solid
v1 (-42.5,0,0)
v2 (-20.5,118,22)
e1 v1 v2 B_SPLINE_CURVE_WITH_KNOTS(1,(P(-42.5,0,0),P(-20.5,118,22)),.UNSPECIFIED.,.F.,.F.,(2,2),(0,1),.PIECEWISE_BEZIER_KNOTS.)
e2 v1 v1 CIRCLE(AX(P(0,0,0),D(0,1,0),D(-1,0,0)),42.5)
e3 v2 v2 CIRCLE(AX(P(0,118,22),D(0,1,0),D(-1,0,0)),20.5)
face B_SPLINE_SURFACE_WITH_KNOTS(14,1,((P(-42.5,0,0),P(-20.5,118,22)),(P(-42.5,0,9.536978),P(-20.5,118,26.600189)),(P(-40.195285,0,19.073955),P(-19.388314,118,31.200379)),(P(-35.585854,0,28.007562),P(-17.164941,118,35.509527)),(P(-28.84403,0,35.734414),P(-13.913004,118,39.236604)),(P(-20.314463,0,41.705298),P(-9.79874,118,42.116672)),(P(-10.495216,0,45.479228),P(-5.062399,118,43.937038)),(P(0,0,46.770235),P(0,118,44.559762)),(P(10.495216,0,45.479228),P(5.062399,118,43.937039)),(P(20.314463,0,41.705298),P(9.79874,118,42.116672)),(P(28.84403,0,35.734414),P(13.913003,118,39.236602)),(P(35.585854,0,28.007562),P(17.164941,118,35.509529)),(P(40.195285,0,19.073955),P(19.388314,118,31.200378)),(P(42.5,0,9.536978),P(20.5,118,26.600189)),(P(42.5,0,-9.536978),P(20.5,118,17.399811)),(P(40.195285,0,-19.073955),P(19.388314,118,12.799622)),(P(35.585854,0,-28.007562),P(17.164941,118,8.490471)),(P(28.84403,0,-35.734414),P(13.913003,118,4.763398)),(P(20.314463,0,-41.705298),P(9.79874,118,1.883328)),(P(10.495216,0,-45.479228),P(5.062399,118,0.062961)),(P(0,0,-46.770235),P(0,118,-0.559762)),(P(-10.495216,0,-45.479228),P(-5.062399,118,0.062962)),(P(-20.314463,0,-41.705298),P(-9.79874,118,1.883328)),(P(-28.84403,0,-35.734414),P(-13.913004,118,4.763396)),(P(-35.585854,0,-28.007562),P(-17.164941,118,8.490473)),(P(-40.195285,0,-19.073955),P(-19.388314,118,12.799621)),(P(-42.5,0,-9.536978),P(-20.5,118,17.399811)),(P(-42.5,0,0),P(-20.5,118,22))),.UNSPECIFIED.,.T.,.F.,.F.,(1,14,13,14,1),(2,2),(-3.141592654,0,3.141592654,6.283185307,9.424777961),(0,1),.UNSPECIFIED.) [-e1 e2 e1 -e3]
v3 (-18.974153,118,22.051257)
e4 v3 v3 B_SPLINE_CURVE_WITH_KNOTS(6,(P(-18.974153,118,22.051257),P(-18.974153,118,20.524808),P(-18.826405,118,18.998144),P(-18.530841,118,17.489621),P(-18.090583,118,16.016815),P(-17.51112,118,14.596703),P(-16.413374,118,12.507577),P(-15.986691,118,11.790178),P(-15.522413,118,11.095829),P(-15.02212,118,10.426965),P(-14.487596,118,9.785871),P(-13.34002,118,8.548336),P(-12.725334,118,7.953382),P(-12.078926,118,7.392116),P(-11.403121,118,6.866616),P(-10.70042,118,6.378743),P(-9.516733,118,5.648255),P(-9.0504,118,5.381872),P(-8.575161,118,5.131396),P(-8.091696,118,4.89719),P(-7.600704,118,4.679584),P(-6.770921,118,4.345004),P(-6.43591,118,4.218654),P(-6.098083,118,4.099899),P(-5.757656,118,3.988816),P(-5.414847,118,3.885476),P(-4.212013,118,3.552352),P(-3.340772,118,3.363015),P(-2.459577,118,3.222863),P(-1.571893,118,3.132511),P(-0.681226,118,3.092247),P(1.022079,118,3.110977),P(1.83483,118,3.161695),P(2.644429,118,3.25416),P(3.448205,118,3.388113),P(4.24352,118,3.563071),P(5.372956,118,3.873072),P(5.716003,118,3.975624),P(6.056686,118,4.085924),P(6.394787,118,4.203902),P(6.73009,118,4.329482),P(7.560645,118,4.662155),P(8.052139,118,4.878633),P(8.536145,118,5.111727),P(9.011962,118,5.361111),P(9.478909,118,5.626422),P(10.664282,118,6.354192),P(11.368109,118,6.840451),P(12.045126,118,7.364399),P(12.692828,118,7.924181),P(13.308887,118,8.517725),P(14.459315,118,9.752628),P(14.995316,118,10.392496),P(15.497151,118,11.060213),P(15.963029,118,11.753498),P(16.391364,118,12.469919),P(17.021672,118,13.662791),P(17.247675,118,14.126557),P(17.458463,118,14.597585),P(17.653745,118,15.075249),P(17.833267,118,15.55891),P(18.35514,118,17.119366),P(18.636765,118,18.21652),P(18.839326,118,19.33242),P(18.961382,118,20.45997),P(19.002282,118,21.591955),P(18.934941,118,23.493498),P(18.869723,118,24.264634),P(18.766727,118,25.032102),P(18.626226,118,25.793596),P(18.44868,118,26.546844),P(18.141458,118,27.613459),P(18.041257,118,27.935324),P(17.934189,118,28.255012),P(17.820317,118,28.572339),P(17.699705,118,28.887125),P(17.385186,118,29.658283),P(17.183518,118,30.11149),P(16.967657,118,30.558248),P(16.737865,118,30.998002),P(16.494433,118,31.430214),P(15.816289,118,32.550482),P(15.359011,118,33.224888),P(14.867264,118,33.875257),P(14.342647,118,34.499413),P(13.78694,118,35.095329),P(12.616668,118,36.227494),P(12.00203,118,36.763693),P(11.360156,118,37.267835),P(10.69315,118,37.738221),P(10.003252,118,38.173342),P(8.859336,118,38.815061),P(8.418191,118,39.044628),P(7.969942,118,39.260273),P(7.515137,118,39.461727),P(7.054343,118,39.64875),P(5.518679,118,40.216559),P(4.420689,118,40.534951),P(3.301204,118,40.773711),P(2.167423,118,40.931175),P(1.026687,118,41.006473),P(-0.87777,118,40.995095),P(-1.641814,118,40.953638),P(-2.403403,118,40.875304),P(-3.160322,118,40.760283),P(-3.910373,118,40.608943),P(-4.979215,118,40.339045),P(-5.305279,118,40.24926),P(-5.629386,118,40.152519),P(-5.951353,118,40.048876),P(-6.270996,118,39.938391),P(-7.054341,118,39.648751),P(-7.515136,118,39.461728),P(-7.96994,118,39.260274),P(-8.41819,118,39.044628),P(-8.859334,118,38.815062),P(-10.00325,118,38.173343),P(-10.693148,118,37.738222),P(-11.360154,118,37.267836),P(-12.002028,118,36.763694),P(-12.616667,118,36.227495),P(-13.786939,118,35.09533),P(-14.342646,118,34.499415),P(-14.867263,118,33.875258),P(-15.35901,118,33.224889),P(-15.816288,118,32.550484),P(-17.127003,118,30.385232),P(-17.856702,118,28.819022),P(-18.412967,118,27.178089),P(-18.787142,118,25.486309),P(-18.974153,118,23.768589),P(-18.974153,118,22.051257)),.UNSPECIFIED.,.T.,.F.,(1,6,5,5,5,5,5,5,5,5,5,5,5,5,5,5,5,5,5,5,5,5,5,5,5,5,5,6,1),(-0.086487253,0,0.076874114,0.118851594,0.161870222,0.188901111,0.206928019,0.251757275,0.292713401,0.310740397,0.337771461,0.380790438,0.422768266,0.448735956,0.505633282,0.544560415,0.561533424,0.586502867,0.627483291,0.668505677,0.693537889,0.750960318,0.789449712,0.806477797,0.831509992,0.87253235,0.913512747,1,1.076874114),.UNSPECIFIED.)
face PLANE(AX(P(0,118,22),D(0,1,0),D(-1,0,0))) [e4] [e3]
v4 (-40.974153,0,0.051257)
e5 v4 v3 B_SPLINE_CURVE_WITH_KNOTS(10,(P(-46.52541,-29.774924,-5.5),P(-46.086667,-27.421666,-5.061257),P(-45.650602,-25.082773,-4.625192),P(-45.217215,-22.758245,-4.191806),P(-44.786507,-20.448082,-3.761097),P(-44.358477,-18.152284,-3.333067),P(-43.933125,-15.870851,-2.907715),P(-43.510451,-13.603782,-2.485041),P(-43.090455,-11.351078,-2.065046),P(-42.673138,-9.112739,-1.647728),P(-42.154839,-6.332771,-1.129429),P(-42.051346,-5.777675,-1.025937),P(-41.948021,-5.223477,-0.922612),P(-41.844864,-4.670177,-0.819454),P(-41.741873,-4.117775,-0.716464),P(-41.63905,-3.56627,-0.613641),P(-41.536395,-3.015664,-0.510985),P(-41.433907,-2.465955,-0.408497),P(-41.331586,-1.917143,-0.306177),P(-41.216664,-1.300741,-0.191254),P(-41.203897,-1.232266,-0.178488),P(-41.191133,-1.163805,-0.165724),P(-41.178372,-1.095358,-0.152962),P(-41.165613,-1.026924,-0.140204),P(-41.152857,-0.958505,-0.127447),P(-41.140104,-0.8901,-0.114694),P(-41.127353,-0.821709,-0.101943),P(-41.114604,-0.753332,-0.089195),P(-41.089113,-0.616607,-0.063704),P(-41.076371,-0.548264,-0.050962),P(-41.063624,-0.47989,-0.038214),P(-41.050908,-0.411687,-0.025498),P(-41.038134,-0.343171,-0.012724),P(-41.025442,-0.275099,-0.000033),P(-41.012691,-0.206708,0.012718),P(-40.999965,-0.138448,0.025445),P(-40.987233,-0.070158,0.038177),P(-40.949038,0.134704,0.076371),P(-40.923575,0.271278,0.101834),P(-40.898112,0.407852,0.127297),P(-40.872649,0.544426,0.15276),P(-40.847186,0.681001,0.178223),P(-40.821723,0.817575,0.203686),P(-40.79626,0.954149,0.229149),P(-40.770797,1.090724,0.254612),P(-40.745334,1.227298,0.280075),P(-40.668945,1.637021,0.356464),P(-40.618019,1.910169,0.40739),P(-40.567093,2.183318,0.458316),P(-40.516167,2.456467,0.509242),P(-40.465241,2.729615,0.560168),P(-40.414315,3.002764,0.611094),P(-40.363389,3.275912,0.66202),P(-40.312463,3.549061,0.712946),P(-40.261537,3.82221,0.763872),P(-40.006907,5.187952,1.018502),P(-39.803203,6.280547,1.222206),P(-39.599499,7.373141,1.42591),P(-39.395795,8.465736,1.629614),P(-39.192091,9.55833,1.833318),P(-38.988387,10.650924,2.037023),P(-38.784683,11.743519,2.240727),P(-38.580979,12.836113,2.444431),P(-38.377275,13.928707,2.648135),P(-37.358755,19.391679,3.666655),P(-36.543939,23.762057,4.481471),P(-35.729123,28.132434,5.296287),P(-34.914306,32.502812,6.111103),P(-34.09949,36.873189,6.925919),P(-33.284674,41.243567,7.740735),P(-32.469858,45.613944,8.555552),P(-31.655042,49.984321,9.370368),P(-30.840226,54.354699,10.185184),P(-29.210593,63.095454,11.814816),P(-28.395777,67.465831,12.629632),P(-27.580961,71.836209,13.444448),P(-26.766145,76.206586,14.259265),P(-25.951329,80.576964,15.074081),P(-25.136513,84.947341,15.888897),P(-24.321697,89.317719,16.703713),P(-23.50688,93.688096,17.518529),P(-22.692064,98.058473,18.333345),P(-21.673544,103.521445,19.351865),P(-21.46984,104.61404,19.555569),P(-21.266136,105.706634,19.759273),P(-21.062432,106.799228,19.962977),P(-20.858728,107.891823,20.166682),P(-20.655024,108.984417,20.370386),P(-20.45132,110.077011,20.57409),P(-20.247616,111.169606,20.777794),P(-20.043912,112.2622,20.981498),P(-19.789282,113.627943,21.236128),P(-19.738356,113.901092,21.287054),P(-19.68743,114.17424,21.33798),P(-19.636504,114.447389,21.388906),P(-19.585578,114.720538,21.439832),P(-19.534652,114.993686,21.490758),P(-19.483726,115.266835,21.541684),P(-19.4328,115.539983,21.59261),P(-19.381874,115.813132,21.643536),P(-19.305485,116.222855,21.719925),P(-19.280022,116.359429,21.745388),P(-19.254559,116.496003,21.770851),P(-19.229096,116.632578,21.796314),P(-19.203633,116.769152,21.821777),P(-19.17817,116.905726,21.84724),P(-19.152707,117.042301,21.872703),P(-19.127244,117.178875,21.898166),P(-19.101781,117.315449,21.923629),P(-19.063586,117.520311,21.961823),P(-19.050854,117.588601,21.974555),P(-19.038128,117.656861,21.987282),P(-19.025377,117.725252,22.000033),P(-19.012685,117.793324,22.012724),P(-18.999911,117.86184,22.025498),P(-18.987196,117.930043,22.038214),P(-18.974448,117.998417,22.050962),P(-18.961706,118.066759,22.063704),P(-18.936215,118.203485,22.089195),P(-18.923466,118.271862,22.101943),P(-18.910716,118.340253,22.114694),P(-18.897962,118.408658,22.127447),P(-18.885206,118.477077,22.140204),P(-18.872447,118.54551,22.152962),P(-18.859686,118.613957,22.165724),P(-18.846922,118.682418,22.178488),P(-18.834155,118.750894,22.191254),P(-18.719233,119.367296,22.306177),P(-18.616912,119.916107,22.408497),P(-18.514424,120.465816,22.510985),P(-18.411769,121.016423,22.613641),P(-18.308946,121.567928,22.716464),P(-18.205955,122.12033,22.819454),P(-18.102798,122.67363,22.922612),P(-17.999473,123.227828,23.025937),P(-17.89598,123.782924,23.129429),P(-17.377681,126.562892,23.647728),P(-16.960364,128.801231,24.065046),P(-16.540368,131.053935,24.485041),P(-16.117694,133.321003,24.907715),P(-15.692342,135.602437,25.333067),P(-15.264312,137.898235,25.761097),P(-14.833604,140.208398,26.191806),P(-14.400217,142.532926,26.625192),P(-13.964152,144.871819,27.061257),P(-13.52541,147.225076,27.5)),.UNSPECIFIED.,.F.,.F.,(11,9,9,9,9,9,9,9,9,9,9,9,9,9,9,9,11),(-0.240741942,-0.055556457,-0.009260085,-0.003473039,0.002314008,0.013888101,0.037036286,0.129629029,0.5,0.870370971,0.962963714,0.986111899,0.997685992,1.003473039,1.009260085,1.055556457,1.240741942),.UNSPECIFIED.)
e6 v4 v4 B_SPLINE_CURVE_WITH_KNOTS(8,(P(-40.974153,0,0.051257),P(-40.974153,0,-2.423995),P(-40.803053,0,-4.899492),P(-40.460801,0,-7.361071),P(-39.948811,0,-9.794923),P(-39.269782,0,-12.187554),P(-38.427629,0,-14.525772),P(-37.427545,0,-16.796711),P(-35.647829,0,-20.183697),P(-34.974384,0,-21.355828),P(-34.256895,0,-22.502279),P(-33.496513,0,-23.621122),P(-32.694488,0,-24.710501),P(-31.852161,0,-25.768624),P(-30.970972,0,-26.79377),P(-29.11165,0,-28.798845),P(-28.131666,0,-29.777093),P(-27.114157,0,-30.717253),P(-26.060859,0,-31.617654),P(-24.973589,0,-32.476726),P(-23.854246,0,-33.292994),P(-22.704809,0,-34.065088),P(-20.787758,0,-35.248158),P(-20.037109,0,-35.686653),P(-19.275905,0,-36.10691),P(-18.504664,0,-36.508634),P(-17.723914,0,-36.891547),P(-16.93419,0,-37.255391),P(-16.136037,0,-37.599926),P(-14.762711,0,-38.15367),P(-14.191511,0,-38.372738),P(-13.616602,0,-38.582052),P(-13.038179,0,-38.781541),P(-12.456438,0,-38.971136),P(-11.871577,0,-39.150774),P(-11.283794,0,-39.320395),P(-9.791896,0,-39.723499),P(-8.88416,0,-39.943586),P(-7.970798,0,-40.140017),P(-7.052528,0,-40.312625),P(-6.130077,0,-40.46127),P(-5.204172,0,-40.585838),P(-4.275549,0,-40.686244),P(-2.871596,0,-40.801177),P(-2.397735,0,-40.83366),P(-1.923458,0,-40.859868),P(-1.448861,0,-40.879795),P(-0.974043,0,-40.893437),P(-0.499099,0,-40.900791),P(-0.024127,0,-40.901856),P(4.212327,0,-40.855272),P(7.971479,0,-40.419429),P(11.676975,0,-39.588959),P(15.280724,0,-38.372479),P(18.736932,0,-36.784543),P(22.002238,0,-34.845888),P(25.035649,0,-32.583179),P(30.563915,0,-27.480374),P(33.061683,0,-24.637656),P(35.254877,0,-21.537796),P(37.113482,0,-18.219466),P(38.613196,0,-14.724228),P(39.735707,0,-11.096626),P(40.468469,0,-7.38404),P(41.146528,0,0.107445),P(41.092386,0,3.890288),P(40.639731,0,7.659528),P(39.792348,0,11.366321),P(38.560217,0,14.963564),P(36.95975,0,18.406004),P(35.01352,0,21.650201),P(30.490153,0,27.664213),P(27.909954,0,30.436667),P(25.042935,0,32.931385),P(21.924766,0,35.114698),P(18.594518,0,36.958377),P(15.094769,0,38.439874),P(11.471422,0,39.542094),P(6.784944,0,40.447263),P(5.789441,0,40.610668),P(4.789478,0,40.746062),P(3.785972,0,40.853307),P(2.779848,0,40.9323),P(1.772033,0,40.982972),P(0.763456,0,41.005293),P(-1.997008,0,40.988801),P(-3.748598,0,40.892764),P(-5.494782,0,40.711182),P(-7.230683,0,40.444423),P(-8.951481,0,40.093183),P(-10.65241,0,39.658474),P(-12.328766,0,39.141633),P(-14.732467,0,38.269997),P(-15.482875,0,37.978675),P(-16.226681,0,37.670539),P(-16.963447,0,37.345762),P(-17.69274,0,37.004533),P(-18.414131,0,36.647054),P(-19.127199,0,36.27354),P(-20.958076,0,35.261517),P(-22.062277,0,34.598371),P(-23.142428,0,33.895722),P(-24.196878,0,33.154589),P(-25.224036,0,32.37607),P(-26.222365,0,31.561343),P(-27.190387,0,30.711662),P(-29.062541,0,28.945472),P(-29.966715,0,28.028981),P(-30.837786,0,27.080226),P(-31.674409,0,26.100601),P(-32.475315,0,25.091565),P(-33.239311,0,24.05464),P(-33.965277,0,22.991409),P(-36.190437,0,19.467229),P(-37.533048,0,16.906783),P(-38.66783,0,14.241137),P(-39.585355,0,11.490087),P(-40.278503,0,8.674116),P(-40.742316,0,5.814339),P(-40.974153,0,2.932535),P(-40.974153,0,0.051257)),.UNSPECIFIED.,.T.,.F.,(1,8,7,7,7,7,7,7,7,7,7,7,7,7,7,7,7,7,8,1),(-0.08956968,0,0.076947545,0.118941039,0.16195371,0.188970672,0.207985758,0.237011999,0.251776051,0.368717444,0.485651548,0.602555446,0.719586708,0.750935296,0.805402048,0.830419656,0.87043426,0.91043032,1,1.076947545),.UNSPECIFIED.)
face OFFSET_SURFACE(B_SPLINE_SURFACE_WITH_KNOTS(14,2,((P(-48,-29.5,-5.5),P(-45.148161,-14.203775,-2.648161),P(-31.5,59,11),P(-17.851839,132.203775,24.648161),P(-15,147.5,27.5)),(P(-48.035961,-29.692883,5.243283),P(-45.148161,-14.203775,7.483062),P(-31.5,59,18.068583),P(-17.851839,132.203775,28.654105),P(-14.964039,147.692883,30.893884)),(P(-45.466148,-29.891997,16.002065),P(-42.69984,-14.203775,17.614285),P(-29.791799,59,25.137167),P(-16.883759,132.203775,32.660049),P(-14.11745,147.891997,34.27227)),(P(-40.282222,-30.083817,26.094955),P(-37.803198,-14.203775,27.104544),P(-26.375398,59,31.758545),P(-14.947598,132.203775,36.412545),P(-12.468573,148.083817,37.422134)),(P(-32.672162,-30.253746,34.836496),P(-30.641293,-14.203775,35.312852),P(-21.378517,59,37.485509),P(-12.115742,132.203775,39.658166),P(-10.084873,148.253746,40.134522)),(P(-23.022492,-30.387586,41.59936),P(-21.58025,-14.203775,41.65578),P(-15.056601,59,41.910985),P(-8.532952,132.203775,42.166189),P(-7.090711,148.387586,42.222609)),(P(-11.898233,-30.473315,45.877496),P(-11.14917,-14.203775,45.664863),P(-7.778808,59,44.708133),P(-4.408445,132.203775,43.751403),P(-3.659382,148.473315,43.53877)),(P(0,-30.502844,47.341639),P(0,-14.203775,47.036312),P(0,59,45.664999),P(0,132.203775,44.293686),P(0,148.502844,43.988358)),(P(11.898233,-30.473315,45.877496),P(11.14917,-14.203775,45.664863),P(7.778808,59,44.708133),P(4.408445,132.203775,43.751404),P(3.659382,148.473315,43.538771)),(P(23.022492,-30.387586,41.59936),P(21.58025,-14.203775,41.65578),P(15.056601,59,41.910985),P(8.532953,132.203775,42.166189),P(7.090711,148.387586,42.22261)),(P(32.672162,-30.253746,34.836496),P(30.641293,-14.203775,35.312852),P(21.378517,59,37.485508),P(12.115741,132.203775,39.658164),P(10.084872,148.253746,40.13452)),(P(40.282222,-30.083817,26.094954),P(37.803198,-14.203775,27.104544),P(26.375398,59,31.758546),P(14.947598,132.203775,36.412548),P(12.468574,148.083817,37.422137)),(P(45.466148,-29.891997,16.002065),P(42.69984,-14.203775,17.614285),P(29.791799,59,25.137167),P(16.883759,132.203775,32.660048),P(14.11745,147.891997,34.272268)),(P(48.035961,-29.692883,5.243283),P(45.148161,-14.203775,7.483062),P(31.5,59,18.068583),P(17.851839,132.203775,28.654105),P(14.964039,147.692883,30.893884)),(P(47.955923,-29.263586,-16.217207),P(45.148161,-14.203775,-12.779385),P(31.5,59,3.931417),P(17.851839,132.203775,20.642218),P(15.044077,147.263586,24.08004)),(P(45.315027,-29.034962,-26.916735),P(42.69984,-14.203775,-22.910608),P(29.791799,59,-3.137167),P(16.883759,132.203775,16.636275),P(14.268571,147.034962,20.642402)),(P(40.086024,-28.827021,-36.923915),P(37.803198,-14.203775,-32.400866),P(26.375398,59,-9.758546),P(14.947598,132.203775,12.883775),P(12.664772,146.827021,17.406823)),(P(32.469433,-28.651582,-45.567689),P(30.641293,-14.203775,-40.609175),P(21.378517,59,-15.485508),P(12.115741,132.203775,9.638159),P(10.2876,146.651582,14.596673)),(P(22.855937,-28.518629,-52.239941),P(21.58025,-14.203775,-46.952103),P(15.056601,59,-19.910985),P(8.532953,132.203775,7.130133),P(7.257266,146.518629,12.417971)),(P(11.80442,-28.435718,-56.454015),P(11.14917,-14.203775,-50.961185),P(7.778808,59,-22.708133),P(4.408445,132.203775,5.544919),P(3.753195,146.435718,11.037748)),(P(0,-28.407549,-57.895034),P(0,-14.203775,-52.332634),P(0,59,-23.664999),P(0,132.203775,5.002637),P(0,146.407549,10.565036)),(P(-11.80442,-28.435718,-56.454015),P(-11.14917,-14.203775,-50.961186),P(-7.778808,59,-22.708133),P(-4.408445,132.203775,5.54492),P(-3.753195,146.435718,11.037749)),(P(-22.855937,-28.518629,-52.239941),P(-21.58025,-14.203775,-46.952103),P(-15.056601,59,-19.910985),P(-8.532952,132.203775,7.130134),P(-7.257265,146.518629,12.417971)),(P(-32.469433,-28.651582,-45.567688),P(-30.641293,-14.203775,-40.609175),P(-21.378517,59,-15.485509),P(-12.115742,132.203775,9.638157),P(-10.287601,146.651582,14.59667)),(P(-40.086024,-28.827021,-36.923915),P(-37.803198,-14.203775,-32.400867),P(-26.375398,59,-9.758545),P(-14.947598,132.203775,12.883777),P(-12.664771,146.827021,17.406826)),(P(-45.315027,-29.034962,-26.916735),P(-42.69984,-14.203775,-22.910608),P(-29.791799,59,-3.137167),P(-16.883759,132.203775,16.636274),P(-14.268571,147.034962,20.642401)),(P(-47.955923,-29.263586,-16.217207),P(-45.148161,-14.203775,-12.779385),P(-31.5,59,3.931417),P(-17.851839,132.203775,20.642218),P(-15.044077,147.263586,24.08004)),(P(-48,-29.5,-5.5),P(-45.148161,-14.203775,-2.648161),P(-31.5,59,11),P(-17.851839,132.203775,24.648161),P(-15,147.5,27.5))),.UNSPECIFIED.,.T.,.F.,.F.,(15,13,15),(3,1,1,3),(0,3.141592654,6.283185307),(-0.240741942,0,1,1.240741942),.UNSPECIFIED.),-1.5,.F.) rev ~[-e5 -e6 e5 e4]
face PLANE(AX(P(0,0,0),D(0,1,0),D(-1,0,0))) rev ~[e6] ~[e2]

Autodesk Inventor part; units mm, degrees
ref_plane "YZ Plane" through (0, 0, 0) normal (1, 0, 0) x (0, 1, 0)
ref_plane "XY Plane" through (0, 0, 0) normal (0, 0, 1) x (1, 0, 0)
sketch "Szkic6" plane through (0, 0, 0) normal (0, 1, 0) x (-1, 0, 0)
  circle A0 centre (0, 0) radius 42.5
  dimension "d33" = 85
ref_plane "Płaszczyzna konstrukcyjna1" through (0, 118, 0) normal (0, 1, 0) x (-1, 0, 0)
sketch "Szkic7" plane through (0, 118, 0) normal (0, 1, 0) x (-1, 0, 0)
  circle A0 centre (0, 22) radius 20.5
  line L0 (0, -20.3) -> (0, 20.3) construction
  circle A1 centre (0, 0) radius 42.5 construction
  dimension "d35" = 41
loft "Wyciągnięcie złożone1" add profiles "Szkic6", "Szkic7"
shell "Skorupa1" thickness 1.5 removed faces 2 at (4.592, 118, 24.4101) at (10.6049, 0, 7.3037)
equation "\"d33\" = OD1"
equation "\"d35\" = OD2"
equation "\"d52\" = THK"
equation "\"SzerokośćGięciaPodcięcia\" = Grubość"
equation "\"RozmiarPodcięciaNarożnika\" = 4 * Grubość"
equation "\"PromieńPrzejścia\" = PromieńGięcia"
equation "\"Rozmiar_promienia_Jacobiego\" = PromieńGięcia"
equation "\"Wielk_odstępu\" = Grubość"
equation "\"d2\" = PromieńGięcia"
equation "\"d23\" = PromieńGięcia"
equation "\"OD1\" = 85"
equation "\"OD2\" = 41"
equation "\"L\" = 118"
equation "\"THK\" = 1.5"
equation "\"d34\" = L"
equation "\"Grubość\" = 1.5"
equation "\"PromieńGięcia\" = 3"
properties part number "Redukcja asymetryczna Ø85x41x1,5 L=118" material "304"
